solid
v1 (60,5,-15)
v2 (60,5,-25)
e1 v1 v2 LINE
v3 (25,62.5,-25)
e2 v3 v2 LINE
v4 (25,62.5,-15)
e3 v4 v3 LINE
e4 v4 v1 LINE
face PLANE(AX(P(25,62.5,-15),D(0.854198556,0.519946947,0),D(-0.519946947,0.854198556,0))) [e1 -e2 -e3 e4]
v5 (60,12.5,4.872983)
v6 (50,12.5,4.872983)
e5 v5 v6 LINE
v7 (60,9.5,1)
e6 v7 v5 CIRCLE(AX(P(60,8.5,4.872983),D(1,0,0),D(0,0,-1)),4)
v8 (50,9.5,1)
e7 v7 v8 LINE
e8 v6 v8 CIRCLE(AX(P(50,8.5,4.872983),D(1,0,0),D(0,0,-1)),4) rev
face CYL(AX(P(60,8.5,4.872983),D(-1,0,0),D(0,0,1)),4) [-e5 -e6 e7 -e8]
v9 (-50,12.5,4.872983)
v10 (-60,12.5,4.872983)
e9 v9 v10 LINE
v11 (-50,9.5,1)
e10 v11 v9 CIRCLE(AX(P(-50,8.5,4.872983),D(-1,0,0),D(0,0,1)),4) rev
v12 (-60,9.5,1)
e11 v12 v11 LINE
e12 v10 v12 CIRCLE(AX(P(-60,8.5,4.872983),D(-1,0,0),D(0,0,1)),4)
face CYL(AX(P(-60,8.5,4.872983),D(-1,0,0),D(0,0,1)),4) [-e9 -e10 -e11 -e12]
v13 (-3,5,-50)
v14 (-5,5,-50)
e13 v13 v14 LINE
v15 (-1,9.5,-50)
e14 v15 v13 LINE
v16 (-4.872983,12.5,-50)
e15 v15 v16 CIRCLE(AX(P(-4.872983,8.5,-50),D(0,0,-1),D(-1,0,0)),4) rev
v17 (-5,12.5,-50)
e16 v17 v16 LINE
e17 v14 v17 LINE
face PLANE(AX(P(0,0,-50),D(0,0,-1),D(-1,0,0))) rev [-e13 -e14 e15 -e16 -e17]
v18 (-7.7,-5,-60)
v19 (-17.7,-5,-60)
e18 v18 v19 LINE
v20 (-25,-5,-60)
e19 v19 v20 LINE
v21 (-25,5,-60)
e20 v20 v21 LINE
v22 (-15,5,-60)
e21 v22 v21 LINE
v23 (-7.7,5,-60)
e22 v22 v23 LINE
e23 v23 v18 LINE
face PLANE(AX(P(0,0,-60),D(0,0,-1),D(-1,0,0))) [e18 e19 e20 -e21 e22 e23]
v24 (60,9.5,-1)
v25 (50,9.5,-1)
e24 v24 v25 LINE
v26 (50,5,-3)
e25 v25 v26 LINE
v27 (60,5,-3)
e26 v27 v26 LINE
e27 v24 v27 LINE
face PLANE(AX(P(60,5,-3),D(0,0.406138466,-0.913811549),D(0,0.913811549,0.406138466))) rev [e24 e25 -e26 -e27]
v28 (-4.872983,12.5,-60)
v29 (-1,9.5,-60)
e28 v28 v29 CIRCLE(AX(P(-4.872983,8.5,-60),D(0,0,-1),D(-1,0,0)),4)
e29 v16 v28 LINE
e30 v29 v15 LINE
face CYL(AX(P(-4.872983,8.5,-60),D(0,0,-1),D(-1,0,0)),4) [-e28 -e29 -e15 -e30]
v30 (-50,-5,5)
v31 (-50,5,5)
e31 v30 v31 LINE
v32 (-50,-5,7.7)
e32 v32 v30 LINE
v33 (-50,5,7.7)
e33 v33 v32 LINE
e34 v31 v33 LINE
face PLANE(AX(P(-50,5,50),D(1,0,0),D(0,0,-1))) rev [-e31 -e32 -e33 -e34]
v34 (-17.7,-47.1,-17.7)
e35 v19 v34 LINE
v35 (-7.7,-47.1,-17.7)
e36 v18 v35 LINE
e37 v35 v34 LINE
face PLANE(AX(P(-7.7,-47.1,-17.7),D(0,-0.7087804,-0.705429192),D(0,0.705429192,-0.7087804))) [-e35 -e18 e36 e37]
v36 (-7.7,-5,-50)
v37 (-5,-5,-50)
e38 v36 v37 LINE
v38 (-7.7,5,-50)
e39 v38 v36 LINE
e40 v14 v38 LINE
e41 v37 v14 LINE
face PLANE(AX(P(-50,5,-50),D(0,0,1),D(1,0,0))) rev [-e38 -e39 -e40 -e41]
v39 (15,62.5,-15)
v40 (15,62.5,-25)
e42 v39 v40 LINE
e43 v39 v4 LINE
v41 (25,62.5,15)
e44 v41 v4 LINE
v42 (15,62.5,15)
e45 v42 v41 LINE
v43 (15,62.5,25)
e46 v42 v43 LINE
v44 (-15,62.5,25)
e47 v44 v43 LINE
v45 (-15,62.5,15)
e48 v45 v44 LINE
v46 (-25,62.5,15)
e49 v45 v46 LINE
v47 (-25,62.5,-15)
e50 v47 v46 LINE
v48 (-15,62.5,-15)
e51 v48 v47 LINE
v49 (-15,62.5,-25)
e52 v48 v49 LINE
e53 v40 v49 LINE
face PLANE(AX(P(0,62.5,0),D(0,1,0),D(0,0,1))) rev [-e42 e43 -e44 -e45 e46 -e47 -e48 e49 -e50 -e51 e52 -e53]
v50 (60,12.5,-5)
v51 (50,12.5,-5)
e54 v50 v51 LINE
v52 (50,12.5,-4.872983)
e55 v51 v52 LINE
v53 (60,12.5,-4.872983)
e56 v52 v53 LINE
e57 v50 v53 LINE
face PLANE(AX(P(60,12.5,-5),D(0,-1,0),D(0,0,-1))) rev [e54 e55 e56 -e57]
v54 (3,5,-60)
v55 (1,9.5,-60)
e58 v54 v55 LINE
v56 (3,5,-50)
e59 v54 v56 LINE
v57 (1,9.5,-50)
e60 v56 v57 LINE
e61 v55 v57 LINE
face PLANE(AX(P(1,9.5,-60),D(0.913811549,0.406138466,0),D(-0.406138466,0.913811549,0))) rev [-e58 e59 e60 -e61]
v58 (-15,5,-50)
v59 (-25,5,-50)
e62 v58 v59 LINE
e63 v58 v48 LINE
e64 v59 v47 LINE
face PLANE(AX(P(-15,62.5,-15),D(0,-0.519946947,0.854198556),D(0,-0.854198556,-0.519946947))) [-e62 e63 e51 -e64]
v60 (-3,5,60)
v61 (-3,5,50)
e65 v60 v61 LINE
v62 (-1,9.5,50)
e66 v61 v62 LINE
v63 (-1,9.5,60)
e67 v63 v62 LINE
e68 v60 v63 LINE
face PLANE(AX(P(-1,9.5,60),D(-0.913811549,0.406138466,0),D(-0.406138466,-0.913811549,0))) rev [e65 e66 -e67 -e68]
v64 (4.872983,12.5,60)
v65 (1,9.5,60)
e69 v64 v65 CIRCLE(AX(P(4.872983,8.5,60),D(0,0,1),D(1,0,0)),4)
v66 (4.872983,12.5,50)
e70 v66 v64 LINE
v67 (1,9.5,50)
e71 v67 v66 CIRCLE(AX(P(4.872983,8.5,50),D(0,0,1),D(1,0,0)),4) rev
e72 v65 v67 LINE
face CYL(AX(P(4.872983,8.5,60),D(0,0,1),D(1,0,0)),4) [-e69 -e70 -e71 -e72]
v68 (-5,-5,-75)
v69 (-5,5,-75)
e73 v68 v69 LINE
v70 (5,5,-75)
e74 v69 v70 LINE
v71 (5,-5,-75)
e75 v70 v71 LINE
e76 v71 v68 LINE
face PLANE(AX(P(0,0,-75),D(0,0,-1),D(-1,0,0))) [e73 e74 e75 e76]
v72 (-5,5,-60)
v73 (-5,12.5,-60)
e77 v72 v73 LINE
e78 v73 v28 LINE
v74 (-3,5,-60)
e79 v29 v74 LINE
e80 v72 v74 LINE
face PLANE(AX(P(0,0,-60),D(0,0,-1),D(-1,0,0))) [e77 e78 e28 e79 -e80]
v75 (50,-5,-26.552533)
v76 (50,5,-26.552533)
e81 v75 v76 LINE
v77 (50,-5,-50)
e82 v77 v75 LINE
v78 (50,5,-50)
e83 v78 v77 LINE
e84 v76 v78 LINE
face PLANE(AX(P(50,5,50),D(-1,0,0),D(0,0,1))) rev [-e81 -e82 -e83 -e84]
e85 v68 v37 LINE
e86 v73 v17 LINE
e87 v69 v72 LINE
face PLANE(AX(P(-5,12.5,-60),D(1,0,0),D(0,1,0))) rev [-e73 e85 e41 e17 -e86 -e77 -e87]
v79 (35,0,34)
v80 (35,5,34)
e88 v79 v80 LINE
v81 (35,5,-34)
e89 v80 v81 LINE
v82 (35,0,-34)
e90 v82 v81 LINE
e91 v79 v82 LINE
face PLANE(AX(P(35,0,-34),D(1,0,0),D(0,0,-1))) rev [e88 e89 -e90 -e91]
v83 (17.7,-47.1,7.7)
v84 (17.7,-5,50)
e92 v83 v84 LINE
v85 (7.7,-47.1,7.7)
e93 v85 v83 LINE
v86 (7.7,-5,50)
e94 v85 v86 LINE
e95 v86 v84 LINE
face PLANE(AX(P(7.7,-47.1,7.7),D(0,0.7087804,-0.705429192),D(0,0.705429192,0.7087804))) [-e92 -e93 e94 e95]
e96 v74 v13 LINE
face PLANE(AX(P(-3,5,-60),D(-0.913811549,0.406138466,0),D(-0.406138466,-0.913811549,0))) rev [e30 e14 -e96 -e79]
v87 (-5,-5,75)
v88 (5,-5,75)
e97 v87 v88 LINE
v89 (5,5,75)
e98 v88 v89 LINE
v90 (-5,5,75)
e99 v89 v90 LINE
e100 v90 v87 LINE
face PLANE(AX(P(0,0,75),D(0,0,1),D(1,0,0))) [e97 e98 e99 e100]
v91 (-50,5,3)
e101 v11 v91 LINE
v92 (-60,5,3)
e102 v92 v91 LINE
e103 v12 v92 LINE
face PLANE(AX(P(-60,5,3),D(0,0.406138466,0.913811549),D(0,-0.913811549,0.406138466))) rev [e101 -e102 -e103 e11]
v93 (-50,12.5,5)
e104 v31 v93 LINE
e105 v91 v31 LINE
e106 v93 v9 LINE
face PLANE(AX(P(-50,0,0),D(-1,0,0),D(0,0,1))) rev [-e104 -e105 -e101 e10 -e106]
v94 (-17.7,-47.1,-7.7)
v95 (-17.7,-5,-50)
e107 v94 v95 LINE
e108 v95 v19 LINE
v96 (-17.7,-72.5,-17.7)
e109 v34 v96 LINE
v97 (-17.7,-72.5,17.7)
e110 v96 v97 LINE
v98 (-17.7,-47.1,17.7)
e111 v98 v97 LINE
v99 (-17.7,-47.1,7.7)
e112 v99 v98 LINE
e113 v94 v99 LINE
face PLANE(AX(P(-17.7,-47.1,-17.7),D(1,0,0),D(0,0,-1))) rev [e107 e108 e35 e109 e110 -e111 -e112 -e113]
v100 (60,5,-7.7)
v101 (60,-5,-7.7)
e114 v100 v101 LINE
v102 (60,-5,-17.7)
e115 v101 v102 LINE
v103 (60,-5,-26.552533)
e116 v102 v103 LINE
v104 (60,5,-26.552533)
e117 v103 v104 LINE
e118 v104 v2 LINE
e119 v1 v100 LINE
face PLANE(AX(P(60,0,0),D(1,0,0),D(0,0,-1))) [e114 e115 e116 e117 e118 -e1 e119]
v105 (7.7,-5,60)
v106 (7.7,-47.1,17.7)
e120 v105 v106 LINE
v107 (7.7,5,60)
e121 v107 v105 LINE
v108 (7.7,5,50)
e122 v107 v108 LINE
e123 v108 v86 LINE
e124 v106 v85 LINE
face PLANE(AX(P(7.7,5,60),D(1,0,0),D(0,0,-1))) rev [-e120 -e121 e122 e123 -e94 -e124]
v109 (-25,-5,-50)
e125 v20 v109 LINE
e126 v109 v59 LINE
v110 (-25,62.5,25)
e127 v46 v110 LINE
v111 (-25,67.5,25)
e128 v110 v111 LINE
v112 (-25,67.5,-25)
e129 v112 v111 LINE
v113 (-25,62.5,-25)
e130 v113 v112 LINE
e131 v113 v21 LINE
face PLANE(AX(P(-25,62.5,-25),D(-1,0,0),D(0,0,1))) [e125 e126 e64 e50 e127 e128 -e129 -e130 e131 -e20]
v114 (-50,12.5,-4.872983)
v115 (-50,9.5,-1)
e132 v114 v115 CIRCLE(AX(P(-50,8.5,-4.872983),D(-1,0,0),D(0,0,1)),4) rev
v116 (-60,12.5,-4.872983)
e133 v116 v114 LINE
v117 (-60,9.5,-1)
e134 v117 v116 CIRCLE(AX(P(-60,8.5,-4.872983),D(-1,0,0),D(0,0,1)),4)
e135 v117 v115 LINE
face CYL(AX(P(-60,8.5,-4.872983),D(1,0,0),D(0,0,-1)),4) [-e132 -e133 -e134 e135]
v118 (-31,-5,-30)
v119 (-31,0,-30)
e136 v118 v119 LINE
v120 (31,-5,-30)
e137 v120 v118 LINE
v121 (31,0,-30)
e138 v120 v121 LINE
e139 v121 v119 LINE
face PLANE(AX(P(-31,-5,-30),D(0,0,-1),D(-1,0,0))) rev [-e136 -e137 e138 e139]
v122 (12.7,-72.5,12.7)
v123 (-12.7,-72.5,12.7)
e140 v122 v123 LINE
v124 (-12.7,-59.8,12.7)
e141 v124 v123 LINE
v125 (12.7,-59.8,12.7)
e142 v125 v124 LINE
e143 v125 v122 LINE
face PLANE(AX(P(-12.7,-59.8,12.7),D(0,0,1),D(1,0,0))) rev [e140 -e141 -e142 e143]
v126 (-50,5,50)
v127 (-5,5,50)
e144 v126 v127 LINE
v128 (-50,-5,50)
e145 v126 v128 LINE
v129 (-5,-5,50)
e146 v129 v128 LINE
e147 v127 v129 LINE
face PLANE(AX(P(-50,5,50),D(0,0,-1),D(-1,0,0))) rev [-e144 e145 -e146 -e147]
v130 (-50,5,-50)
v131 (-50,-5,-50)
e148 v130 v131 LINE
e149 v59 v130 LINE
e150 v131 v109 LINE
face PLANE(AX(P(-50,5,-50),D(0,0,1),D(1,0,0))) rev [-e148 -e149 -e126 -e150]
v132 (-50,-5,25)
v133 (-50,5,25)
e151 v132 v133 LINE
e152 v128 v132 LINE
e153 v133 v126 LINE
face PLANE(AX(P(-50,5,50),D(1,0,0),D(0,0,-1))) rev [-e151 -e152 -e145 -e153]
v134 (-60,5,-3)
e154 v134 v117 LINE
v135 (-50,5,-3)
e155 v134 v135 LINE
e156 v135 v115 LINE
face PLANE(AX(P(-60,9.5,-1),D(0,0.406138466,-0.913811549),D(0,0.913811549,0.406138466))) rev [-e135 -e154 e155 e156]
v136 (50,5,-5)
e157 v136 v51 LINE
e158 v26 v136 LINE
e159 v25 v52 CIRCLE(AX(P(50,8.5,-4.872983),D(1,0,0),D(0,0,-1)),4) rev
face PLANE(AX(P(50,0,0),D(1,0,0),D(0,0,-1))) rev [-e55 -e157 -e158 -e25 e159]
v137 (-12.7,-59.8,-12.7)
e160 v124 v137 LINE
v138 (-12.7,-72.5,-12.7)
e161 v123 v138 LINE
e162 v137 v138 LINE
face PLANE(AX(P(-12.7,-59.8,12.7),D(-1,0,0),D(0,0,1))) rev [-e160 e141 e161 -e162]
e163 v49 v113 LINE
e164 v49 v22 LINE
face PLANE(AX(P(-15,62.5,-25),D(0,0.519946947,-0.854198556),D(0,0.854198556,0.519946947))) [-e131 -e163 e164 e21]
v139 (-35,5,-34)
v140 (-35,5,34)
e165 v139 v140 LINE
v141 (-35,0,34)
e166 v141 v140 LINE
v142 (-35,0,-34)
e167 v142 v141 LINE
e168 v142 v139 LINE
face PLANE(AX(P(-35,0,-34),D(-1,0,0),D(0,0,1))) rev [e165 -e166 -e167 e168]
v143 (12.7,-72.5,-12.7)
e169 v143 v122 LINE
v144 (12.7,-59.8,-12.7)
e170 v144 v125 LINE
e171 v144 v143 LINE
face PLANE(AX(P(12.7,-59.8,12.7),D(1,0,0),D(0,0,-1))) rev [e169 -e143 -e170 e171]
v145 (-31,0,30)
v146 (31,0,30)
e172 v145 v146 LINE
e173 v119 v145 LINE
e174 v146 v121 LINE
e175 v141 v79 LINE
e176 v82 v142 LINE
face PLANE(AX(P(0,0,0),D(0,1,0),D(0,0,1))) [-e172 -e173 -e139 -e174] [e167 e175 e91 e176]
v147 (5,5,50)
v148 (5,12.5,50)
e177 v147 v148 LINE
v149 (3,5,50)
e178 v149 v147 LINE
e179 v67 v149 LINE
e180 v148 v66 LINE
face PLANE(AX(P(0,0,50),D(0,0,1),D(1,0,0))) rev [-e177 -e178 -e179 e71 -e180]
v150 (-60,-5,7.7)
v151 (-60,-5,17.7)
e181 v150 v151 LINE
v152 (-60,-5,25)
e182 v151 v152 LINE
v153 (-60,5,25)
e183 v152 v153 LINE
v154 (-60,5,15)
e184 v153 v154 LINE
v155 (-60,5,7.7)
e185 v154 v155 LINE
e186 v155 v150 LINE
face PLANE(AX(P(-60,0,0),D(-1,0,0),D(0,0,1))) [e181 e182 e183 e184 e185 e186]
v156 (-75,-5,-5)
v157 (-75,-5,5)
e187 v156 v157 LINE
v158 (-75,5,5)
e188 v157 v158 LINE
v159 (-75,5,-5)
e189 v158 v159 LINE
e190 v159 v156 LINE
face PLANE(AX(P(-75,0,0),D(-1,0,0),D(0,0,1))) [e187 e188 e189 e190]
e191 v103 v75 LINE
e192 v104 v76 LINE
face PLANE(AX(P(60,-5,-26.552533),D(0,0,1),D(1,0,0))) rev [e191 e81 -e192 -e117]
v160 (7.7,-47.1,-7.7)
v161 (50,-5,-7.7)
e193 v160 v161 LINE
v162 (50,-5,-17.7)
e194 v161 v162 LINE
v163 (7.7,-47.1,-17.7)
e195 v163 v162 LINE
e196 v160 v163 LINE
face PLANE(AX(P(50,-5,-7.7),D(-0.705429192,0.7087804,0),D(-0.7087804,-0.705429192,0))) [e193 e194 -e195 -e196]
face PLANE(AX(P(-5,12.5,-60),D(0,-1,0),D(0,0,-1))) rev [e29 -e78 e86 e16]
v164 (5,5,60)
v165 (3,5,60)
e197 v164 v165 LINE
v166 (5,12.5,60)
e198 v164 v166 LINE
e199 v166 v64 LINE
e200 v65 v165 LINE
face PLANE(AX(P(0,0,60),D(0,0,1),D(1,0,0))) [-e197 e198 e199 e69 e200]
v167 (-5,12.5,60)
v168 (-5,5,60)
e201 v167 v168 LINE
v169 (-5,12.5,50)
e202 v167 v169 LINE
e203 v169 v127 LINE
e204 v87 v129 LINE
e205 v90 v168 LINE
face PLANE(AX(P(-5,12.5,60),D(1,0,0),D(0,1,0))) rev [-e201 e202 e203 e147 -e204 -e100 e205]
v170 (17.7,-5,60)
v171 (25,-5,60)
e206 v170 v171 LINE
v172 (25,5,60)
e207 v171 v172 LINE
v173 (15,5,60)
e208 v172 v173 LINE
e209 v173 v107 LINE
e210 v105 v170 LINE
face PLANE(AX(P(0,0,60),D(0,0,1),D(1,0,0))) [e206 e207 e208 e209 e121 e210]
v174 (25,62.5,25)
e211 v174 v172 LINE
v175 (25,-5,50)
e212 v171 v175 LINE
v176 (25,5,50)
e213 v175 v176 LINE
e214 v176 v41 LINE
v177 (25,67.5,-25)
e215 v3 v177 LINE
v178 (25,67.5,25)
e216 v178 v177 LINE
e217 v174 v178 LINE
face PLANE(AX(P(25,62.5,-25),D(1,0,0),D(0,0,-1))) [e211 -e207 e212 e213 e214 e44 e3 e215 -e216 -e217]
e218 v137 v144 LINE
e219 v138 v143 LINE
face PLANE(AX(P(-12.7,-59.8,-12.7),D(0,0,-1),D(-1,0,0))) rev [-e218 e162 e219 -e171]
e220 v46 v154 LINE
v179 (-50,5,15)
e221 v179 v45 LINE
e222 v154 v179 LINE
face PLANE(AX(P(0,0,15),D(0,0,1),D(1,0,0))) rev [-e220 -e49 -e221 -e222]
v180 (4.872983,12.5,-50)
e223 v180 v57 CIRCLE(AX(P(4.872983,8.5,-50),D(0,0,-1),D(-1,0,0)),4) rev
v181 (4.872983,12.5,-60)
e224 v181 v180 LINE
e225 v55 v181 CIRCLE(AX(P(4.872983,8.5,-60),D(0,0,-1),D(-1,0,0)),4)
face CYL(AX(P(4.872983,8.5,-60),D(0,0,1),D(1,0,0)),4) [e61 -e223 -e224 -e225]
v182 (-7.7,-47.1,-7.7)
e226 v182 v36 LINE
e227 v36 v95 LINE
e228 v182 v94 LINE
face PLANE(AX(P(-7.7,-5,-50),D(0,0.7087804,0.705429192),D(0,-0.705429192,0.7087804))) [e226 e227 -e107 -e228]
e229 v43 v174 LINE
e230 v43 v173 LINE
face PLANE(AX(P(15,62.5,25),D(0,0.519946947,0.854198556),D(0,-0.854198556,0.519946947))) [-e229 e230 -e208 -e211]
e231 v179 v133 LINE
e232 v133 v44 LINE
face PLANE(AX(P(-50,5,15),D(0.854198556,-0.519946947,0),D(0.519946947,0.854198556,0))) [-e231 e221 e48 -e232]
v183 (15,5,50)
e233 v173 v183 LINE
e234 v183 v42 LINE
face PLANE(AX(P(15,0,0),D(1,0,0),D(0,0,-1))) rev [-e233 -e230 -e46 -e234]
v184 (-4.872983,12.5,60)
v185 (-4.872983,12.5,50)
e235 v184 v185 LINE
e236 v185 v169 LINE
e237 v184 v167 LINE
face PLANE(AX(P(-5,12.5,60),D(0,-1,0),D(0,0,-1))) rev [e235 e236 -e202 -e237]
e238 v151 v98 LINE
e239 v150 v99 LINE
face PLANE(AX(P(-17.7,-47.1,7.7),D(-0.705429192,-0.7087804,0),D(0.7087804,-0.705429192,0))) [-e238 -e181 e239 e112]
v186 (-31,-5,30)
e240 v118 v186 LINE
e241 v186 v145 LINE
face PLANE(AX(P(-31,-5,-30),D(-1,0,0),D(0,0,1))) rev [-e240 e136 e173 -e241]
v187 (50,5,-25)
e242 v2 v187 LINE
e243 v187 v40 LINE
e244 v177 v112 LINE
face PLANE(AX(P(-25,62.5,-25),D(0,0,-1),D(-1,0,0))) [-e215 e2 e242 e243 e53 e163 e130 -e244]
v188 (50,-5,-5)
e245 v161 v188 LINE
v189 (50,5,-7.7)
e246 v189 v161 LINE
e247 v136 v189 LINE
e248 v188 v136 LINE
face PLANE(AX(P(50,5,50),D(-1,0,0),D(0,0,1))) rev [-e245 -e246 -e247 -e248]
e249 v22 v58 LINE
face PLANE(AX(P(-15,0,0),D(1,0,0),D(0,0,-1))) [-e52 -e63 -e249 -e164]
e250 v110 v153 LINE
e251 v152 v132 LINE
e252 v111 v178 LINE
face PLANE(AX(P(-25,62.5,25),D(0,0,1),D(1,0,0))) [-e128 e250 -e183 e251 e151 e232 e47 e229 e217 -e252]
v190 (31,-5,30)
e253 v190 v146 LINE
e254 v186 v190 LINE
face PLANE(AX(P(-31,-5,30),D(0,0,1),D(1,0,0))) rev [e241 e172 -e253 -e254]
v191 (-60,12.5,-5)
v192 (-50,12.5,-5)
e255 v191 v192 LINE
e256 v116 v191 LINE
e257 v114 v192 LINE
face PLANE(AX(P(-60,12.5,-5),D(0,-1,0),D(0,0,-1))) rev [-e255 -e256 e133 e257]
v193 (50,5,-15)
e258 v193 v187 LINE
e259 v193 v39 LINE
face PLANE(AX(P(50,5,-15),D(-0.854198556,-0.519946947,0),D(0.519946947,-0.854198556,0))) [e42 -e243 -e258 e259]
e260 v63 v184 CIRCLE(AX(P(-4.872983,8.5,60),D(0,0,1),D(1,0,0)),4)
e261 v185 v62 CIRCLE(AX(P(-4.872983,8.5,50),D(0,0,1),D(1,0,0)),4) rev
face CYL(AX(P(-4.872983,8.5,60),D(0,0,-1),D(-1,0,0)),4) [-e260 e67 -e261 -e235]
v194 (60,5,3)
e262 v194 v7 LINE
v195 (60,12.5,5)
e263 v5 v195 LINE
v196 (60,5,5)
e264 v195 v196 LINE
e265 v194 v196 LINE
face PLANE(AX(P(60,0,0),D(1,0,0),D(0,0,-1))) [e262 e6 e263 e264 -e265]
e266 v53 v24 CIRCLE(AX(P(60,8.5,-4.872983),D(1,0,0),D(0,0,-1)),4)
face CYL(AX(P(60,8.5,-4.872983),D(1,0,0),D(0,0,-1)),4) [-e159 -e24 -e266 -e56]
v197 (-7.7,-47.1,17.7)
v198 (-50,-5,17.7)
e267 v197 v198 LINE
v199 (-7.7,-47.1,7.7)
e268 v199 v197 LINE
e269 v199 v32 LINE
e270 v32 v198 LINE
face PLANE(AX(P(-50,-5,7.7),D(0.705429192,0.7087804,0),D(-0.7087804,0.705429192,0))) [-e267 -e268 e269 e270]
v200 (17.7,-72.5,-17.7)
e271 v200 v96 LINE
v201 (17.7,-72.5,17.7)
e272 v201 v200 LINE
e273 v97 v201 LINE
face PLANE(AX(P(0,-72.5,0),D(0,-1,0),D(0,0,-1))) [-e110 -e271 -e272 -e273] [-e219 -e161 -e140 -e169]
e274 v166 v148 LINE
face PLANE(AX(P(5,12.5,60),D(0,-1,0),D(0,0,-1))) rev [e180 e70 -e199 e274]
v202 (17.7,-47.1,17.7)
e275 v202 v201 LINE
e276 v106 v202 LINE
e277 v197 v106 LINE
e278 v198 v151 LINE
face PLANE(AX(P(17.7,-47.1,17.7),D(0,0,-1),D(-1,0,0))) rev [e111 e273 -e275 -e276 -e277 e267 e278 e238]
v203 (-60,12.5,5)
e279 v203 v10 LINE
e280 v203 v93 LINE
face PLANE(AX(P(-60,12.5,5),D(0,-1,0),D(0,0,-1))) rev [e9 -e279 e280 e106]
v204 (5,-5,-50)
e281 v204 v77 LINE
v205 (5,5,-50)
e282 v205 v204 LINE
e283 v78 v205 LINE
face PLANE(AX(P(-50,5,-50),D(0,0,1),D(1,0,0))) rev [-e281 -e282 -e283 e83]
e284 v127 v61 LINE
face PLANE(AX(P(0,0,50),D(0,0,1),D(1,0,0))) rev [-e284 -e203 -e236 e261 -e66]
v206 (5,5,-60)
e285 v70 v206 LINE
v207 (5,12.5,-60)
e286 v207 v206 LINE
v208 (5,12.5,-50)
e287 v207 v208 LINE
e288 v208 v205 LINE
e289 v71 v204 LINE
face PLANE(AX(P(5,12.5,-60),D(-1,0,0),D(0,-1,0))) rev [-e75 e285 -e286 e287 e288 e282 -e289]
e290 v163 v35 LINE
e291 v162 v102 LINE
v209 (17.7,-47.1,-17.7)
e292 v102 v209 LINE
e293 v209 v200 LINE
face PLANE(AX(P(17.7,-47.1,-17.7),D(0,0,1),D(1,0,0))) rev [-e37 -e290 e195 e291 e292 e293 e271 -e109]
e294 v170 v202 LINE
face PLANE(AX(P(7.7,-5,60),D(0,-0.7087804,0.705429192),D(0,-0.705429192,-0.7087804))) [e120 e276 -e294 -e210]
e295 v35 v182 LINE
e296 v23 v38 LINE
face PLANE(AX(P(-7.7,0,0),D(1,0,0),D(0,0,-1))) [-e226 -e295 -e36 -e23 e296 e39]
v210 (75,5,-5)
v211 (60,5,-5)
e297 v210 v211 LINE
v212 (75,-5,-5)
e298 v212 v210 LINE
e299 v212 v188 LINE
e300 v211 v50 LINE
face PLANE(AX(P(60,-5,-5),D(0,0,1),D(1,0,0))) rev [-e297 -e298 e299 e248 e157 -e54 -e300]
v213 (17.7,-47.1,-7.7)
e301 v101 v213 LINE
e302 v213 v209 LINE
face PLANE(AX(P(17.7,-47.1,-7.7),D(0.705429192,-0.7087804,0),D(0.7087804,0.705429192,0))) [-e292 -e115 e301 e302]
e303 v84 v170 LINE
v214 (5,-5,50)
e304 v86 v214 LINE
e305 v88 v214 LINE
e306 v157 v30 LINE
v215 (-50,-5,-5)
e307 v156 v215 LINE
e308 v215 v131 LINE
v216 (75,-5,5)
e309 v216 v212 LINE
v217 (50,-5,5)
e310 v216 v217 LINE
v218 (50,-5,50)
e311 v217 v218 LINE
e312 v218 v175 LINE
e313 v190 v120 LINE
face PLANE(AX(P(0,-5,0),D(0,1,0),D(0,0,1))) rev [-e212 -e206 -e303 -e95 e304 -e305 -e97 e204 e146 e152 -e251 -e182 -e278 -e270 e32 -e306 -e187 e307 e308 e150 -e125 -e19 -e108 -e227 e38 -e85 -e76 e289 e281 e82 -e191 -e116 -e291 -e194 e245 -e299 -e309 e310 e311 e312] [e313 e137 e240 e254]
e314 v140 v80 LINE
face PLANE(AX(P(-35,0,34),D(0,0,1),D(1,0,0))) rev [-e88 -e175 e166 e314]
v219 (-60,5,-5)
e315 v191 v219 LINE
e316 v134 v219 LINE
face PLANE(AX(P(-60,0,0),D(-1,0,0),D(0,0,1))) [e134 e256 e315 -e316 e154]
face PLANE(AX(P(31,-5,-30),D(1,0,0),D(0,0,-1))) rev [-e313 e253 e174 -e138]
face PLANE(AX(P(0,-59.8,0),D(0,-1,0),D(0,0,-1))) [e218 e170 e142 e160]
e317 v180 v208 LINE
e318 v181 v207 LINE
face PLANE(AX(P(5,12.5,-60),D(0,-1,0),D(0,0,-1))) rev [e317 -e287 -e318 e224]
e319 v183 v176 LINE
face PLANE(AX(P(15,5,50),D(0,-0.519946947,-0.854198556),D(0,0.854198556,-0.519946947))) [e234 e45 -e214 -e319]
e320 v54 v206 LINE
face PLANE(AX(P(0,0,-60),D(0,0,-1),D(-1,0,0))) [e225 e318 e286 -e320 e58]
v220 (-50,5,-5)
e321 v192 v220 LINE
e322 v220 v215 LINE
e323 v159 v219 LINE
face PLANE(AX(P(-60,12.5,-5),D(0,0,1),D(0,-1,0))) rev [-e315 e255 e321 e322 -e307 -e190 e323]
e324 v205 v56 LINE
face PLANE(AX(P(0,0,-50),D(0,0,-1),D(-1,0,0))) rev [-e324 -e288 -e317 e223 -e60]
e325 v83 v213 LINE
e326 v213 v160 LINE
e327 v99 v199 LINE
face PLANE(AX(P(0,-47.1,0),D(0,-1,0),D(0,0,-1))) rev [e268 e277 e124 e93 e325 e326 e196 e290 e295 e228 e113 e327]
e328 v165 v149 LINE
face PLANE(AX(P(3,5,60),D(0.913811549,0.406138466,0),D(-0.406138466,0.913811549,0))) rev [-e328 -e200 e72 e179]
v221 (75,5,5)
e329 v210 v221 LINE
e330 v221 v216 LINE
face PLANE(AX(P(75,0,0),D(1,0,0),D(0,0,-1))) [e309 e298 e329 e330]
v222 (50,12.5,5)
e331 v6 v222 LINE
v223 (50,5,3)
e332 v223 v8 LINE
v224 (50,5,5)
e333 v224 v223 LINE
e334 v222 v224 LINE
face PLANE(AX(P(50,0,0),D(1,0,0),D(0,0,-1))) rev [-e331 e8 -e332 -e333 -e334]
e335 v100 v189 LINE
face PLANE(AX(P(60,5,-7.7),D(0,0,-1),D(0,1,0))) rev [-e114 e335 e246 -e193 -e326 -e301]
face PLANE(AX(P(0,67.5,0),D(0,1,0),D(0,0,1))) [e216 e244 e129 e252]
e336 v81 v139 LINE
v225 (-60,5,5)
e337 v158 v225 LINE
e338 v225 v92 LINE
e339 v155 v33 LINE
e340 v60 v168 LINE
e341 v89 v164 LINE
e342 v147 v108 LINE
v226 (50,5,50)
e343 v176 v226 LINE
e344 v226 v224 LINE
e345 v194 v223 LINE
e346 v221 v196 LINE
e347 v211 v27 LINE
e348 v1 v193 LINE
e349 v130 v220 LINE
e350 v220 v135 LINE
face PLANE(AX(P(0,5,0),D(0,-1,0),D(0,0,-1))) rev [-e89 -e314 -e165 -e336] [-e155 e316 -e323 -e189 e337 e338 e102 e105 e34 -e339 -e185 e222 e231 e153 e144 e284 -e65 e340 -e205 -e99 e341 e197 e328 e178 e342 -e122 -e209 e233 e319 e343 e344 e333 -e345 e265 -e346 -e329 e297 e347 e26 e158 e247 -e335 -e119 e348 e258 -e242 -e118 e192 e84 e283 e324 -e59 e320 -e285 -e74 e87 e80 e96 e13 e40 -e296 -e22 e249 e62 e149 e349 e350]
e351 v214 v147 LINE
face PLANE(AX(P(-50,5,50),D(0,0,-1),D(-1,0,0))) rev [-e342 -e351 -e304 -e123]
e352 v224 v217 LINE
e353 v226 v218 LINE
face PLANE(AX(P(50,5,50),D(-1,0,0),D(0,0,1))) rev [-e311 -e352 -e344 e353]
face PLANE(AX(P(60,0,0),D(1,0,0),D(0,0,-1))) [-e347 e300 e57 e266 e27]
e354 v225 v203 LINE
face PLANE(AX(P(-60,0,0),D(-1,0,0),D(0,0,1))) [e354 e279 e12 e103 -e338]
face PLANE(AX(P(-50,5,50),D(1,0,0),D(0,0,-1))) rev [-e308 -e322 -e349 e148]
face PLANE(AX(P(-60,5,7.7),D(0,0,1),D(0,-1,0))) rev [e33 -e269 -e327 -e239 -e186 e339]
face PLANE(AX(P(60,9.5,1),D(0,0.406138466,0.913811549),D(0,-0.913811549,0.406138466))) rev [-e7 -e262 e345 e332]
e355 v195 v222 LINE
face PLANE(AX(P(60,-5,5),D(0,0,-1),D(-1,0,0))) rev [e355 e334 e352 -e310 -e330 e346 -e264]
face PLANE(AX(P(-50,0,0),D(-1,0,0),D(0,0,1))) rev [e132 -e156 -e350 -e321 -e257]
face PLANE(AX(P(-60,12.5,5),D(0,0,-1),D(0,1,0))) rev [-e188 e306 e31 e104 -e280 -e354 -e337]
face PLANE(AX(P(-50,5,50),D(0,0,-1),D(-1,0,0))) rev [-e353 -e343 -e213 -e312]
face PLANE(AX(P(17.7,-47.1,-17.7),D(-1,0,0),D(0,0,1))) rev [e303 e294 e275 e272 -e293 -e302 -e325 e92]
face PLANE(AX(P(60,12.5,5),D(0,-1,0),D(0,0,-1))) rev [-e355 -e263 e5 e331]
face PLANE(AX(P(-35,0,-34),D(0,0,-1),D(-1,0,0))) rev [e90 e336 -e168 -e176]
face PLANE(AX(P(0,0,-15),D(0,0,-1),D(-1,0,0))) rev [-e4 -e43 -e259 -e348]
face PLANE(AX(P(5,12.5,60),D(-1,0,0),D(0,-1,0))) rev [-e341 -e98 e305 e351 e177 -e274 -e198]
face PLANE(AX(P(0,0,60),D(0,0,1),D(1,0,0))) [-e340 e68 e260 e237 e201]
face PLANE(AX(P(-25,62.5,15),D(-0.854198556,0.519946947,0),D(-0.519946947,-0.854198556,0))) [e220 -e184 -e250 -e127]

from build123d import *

# Parameters (mm, degrees)
SKETCH2_W            = 100
SKETCH2_H            = 100
BOSS_EXTRUDE1_DEPTH  = 5
SKETCH3_W            = 100
SKETCH3_H            = 100
BOSS_EXTRUDE2_DEPTH  = 5
SKETCH8_R            = 5
BOSS_EXTRUDE7_DEPTH  = 30
BOSS_EXTRUDE21_DEPTH = 10
FILLET14_R           = 4
FILLET13_R           = 4
SKETCH24_W           = 10
SKETCH24_H           = 10
BOSS_EXTRUDE22_DEPTH = 15
BOSS_EXTRUDE25_DEPTH = 10
SKETCH26_W           = 10
SKETCH26_H           = 10
BOSS_EXTRUDE26_DEPTH = 15
FILLET18_R           = 4
FILLET17_R           = 4
BOSS_EXTRUDE23_DEPTH = 10
SKETCH25_W           = 10
SKETCH25_H           = 10
BOSS_EXTRUDE24_DEPTH = 15
FILLET15_R           = 4
FILLET16_R           = 4
BOSS_EXTRUDE10_DEPTH = 10
FILLET19_R           = 4
SKETCH27_W           = 10
SKETCH27_H           = 10
BOSS_EXTRUDE27_DEPTH = 15
FILLET20_R           = 4
SKETCH62_R           = 11.223510807
CUT_EXTRUDE3_DEPTH   = 30
SKETCH64_W           = 35.4
SKETCH64_H           = 35.4
BOSS_EXTRUDE53_DEPTH = 25.4
SKETCH66_W           = 25.4
SKETCH66_H           = 25.4
CUT_EXTRUDE4_DEPTH   = 12.7
SKETCH67_W           = 50
SKETCH67_H           = 50
BOSS_EXTRUDE54_DEPTH = 5
SKETCH68_W           = 17.3
SKETCH68_H           = 10
BOSS_EXTRUDE55_DEPTH = 10
SKETCH69_W           = 17.3
SKETCH69_H           = 10
BOSS_EXTRUDE56_DEPTH = 10
SKETCH70_W           = 17.3
SKETCH70_H           = 10
BOSS_EXTRUDE57_DEPTH = 10
SKETCH74_W           = 17.3
SKETCH74_H           = 10
BOSS_EXTRUDE58_DEPTH = 10
BOSS_EXTRUDE59_DEPTH = 10
BOSS_EXTRUDE60_DEPTH = 10
BOSS_EXTRUDE61_DEPTH = 10
BOSS_EXTRUDE62_DEPTH = 10
BOSS_EXTRUDE63_DEPTH = 10
BOSS_EXTRUDE64_DEPTH = 10
SKETCH85_W           = 17.3
SKETCH85_H           = 10
BOSS_EXTRUDE65_DEPTH = 10
BOSS_EXTRUDE66_DEPTH = 10
BOSS_EXTRUDE67_DEPTH = 10
SKETCH90_W           = 70
SKETCH90_H           = 68
CUT_EXTRUDE5_DEPTH   = 5
SKETCH91_W           = 62
SKETCH91_H           = 60
CUT_EXTRUDE6_DEPTH   = 5


with BuildPart() as part:
    # Sketch2 → Boss-Extrude1 (new body)
    with BuildSketch(Plane(origin=(0, 0, 0), x_dir=(1, 0, 0), z_dir=(0, 1, 0))):
        Rectangle(SKETCH2_W, SKETCH2_H)
    extrude(amount=BOSS_EXTRUDE1_DEPTH)

    # Sketch3 → Boss-Extrude2 (add)
    with BuildSketch(Plane.XZ):
        Rectangle(SKETCH3_W, SKETCH3_H)
    extrude(amount=BOSS_EXTRUDE2_DEPTH)

    # Sketch8 → Boss-Extrude7 (add)
    with BuildSketch(Plane.XZ.offset(5)):
        with Locations(Location((0, 0, 0), (0, 0, 90))):
            Circle(SKETCH8_R)
    extrude(amount=BOSS_EXTRUDE7_DEPTH)

    # Sketch11 → Boss-Extrude21 (add)
    with BuildSketch(Plane(origin=(50, 0, 0), x_dir=(0, 0, -1), z_dir=(1, 0, 0))):
        Polygon((5, -5), (5, 12.5), (1, 12.5), (1, 9.5), (3, 5), (-3, 5), (-1, 9.5), (-1, 12.5), (-5, 12.5), (-5, -5), align=None)
    extrude(amount=BOSS_EXTRUDE21_DEPTH)

    # Fillet14
    # the kernel refuses this fillet: 4 mm, written as the material it takes off along each edge
    with BuildSketch(Plane(origin=(40.317541634, 12.5, -1), x_dir=(0, -1, 0), z_dir=(1, 0, 0))) as fillet14_piece_1:
        with BuildLine():
            CenterArc((4, 3.872983346), FILLET14_R, 180, 75.522487814)
            Line((0, 3.872983346), (-0.08, 3.872983346))
            Line((-0.08, 3.872983346), (-0.08, 0))
            Line((-0.08, 0), (0, -0.08))
            ThreePointArc((0, -0.08), (1.5, -0.08), (2.98, -0.077459667))
            Line((2.98, -0.077459667), (3, 0))
        make_face()
    extrude(amount=29.364916731, mode=Mode.SUBTRACT)

    # Fillet13
    # the kernel refuses this fillet: 4 mm, written as the material it takes off along each edge
    with BuildSketch(Plane(origin=(40.317541634, 12.5, 1), x_dir=(0, 0, 1), z_dir=(1, 0, 0))) as fillet13_piece_1:
        with BuildLine():
            CenterArc((3.872983346, 4), FILLET13_R, 194.477512186, 75.522487814)
            Line((0, 3), (-0.077459667, 2.98))
            ThreePointArc((-0.077459667, 2.98), (-0.08, 1.5), (-0.08, 0))
            Line((-0.08, 0), (0, -0.08))
            Line((0, -0.08), (3.872983346, -0.08))
            Line((3.872983346, -0.08), (3.872983346, 0))
        make_face()
    extrude(amount=29.364916731, mode=Mode.SUBTRACT)

    # Sketch24 → Boss-Extrude22 (add)
    with BuildSketch(Plane(origin=(60, 0, 0), x_dir=(0, 0, -1), z_dir=(1, 0, 0))):
        Rectangle(SKETCH24_W, SKETCH24_H)
    extrude(amount=BOSS_EXTRUDE22_DEPTH)

    # Sketch13 → Boss-Extrude25 (add)
    with BuildSketch(Plane.ZY.offset(50)):
        Polygon((-5, 12.5), (-5, -5), (5, -5), (5, 12.5), (1, 12.5), (1, 9.5), (3, 5), (-3, 5), (-1, 9.5), (-1, 12.5), align=None)
    extrude(amount=BOSS_EXTRUDE25_DEPTH)

    # Sketch26 → Boss-Extrude26 (add)
    with BuildSketch(Plane.ZY.offset(60)):
        Rectangle(SKETCH26_W, SKETCH26_H)
    extrude(amount=BOSS_EXTRUDE26_DEPTH)

    # Fillet18
    # the kernel refuses this fillet: 4 mm, written as the material it takes off along each edge
    with BuildSketch(Plane(origin=(-40.317541634, 12.5, 1), x_dir=(0, -1, 0), z_dir=(-1, 0, 0))) as fillet18_piece_1:
        with BuildLine():
            CenterArc((4, 3.872983346), FILLET18_R, 180, 75.522487814)
            Line((0, 3.872983346), (-0.08, 3.872983346))
            Line((-0.08, 3.872983346), (-0.08, 0))
            Line((-0.08, 0), (0, -0.08))
            ThreePointArc((0, -0.08), (1.5, -0.08), (2.98, -0.077459667))
            Line((2.98, -0.077459667), (3, 0))
        make_face()
    extrude(amount=29.364916731, mode=Mode.SUBTRACT)

    # Fillet17
    # the kernel refuses this fillet: 4 mm, written as the material it takes off along each edge
    with BuildSketch(Plane(origin=(-40.317541634, 12.5, -1), x_dir=(0, 0, -1), z_dir=(-1, 0, 0))) as fillet17_piece_1:
        with BuildLine():
            CenterArc((3.872983346, 4), FILLET17_R, 194.477512186, 75.522487814)
            Line((0, 3), (-0.077459667, 2.98))
            ThreePointArc((-0.077459667, 2.98), (-0.08, 1.5), (-0.08, 0))
            Line((-0.08, 0), (0, -0.08))
            Line((0, -0.08), (3.872983346, -0.08))
            Line((3.872983346, -0.08), (3.872983346, 0))
        make_face()
    extrude(amount=29.364916731, mode=Mode.SUBTRACT)

    # Sketch14 → Boss-Extrude23 (add)
    with BuildSketch(Plane(origin=(0, 0, -50), x_dir=(-1, 0, 0), z_dir=(0, 0, -1))):
        Polygon((-5, 12.5), (-1, 12.5), (-1, 9.5), (-3, 5), (3, 5), (1, 9.5), (1, 12.5), (5, 12.5), (5, -5), (-5, -5), align=None)
    extrude(amount=BOSS_EXTRUDE23_DEPTH)

    # Sketch25 → Boss-Extrude24 (add)
    with BuildSketch(Plane(origin=(0, 0, -60), x_dir=(-1, 0, 0), z_dir=(0, 0, -1))):
        Rectangle(SKETCH25_W, SKETCH25_H)
    extrude(amount=BOSS_EXTRUDE24_DEPTH)

    # Fillet15
    # the kernel refuses this fillet: 4 mm, written as the material it takes off along each edge
    with BuildSketch(Plane(origin=(-1, 12.5, -40.317541634), x_dir=(0, -1, 0), z_dir=(0, 0, -1))) as fillet15_piece_1:
        with BuildLine():
            CenterArc((4, 3.872983346), FILLET15_R, 180, 75.522487814)
            Line((0, 3.872983346), (-0.08, 3.872983346))
            Line((-0.08, 3.872983346), (-0.08, 0))
            Line((-0.08, 0), (0, -0.08))
            ThreePointArc((0, -0.08), (1.5, -0.08), (2.98, -0.077459667))
            Line((2.98, -0.077459667), (3, 0))
        make_face()
    extrude(amount=29.364916731, mode=Mode.SUBTRACT)

    # Fillet16
    # the kernel refuses this fillet: 4 mm, written as the material it takes off along each edge
    with BuildSketch(Plane(origin=(1, 12.5, -40.317541634), x_dir=(0, -1, 0), z_dir=(0, 0, -1))) as fillet16_piece_1:
        with BuildLine():
            CenterArc((4, -3.872983346), FILLET16_R, 104.477512186, 75.522487814)
            Line((0, -3.872983346), (-0.08, -3.872983346))
            Line((-0.08, -3.872983346), (-0.08, 0))
            Line((-0.08, 0), (0, 0.08))
            ThreePointArc((0, 0.08), (1.5, 0.08), (2.98, 0.077459667))
            Line((2.98, 0.077459667), (3, 0))
        make_face()
    extrude(amount=29.364916731, mode=Mode.SUBTRACT)

    # Sketch12 → Boss-Extrude10 (add)
    with BuildSketch(Plane.XY.offset(50)):
        Polygon((-5, 12.5), (-5, -5), (5, -5), (5, 12.5), (1, 12.5), (1, 9.5), (3, 5), (-3, 5), (-1, 9.5), (-1, 12.5), align=None)
    extrude(amount=BOSS_EXTRUDE10_DEPTH)

    # Fillet19
    # the kernel refuses this fillet: 4 mm, written as the material it takes off along each edge
    with BuildSketch(Plane(origin=(-1, 12.5, 40.317541634), x_dir=(-1, 0, 0), z_dir=(0, 0, 1))) as fillet19_piece_1:
        with BuildLine():
            CenterArc((3.872983346, 4), FILLET19_R, 194.477512186, 75.522487814)
            Line((0, 3), (-0.077459667, 2.98))
            ThreePointArc((-0.077459667, 2.98), (-0.08, 1.5), (-0.08, 0))
            Line((-0.08, 0), (0, -0.08))
            Line((0, -0.08), (3.872983346, -0.08))
            Line((3.872983346, -0.08), (3.872983346, 0))
        make_face()
    extrude(amount=29.364916731, mode=Mode.SUBTRACT)

    # Sketch27 → Boss-Extrude27 (add)
    with BuildSketch(Plane.XY.offset(60)):
        Rectangle(SKETCH27_W, SKETCH27_H)
    extrude(amount=BOSS_EXTRUDE27_DEPTH)

    # Fillet20
    # the kernel refuses this fillet: 4 mm, written as the material it takes off along each edge
    with BuildSketch(Plane(origin=(1, 12.5, 40.317541634), x_dir=(1, 0, 0), z_dir=(0, 0, 1))) as fillet20_piece_1:
        with BuildLine():
            CenterArc((3.872983346, -4), FILLET20_R, 90, 75.522487814)
            Line((0, -3), (-0.077459667, -2.98))
            ThreePointArc((-0.077459667, -2.98), (-0.08, -1.5), (-0.08, 0))
            Line((-0.08, 0), (0, 0.08))
            Line((0, 0.08), (3.872983346, 0.08))
            Line((3.872983346, 0.08), (3.872983346, 0))
        make_face()
    extrude(amount=29.364916731, mode=Mode.SUBTRACT)

    # Sketch62 → Cut-Extrude3 (cut)
    with BuildSketch(Plane.XZ.offset(5)):
        Circle(SKETCH62_R)
    extrude(amount=CUT_EXTRUDE3_DEPTH, mode=Mode.SUBTRACT)

    # Sketch68 → Boss-Extrude55 (add)
    with BuildSketch(Plane.XY.offset(50)):
        with Locations((16.35, 0)):
            Rectangle(SKETCH68_W, SKETCH68_H)
    extrude(amount=BOSS_EXTRUDE55_DEPTH)

    # Sketch69 → Boss-Extrude56 (add)
    with BuildSketch(Plane(origin=(50, 0, 0), x_dir=(0, 0, -1), z_dir=(1, 0, 0))):
        with Locations((17.90253263, 0)):
            Rectangle(SKETCH69_W, SKETCH69_H)
    extrude(amount=BOSS_EXTRUDE56_DEPTH)

    # Sketch70 → Boss-Extrude57 (add)
    with BuildSketch(Plane(origin=(0, 0, -50), x_dir=(-1, 0, 0), z_dir=(0, 0, -1))):
        with Locations((16.35, 0)):
            Rectangle(SKETCH70_W, SKETCH70_H)
    extrude(amount=BOSS_EXTRUDE57_DEPTH)

    # Sketch74 → Boss-Extrude58 (add)
    with BuildSketch(Plane.ZY.offset(50)):
        with Locations((16.35, 0)):
            Rectangle(SKETCH74_W, SKETCH74_H)
    extrude(amount=BOSS_EXTRUDE58_DEPTH)



with BuildPart() as body_2:
    # Sketch64 → Boss-Extrude53 (new body)
    with BuildSketch(Plane(origin=(0, -72.5, 0), x_dir=(1, 0, 0), z_dir=(0, 1, 0))):
        Rectangle(SKETCH64_W, SKETCH64_H)
    extrude(amount=BOSS_EXTRUDE53_DEPTH)

    # Sketch66 → Cut-Extrude4 (cut)
    with BuildSketch(Plane(origin=(0, -72.5, 0), x_dir=(-1, 0, 0), z_dir=(0, -1, 0))):
        Rectangle(SKETCH66_W, SKETCH66_H)
    extrude(amount=-CUT_EXTRUDE4_DEPTH, mode=Mode.SUBTRACT)


with BuildPart() as body_3:
    # Sketch67 → Boss-Extrude54 (new body)
    with BuildSketch(Plane(origin=(0, 67.5, 0), x_dir=(1, 0, 0), z_dir=(0, 1, 0))):
        Rectangle(SKETCH67_W, SKETCH67_H)
    extrude(amount=-BOSS_EXTRUDE54_DEPTH)


with BuildPart() as part_1:
    add(part.part)

    add(body_2.part)  # Boss-Extrude59 merges body 2
    # Sketch76 → Boss-Extrude59 (add)
    with BuildSketch(Plane.ZY.offset(17.7)):
        Polygon((-17.7, -47.1), (-60, -5), (-50, -5), (-7.7, -47.1), align=None)
    extrude(amount=-BOSS_EXTRUDE59_DEPTH)


    add(body_3.part)  # Boss-Extrude60 merges body 3
    # Sketch77 → Boss-Extrude60 (add)
    with BuildSketch(Plane.ZY.offset(25)):
        Polygon((-25, 62.5), (-60, 5), (-50, 5), (-15, 62.5), align=None)
    extrude(amount=-BOSS_EXTRUDE60_DEPTH)

    # Sketch78 → Boss-Extrude61 (add)
    with BuildSketch(Plane.XY.offset(17.7)):
        Polygon((-17.7, -47.1), (-60, -5), (-50, -5), (-7.7, -47.1), align=None)
    extrude(amount=-BOSS_EXTRUDE61_DEPTH)

    # Sketch79 → Boss-Extrude62 (add)
    with BuildSketch(Plane.XY.offset(25)):
        Polygon((-25, 62.5), (-60, 5), (-50, 5), (-15, 62.5), align=None)
    extrude(amount=-BOSS_EXTRUDE62_DEPTH)

    # Sketch82 → Boss-Extrude63 (add)
    with BuildSketch(Plane(origin=(17.7, 0, 0), x_dir=(0, 0, -1), z_dir=(1, 0, 0))):
        Polygon((-60, -5), (-17.7, -47.1), (-7.7, -47.1), (-50, -5), align=None)
    extrude(amount=-BOSS_EXTRUDE63_DEPTH)

    # Sketch83 → Boss-Extrude64 (add)
    with BuildSketch(Plane(origin=(25, 0, 0), x_dir=(0, 0, -1), z_dir=(1, 0, 0))):
        Polygon((-25, 62.5), (-60, 5), (-50, 5), (-15, 62.5), align=None)
    extrude(amount=-BOSS_EXTRUDE64_DEPTH)

    # Sketch85 → Boss-Extrude65 (add)
    with BuildSketch(Plane(origin=(50, 0, 0), x_dir=(0, 0, -1), z_dir=(1, 0, 0))):
        with Locations((16.35, 0)):
            Rectangle(SKETCH85_W, SKETCH85_H)
    extrude(amount=BOSS_EXTRUDE65_DEPTH)

    # Sketch86 → Boss-Extrude66 (add)
    with BuildSketch(Plane(origin=(0, 0, -25), x_dir=(-1, 0, 0), z_dir=(0, 0, -1))):
        Polygon((-25, 62.5), (-60, 5), (-50, 5), (-15, 62.5), align=None)
    extrude(amount=-BOSS_EXTRUDE66_DEPTH)

    # Sketch89 → Boss-Extrude67 (add)
    with BuildSketch(Plane(origin=(0, 0, -17.7), x_dir=(-1, 0, 0), z_dir=(0, 0, -1))):
        Polygon((-60, -5), (-50, -5), (-7.7, -47.1), (-17.7, -47.1), align=None)
    extrude(amount=-BOSS_EXTRUDE67_DEPTH)

    # Sketch90 → Cut-Extrude5 (cut)
    with BuildSketch(Plane(origin=(0, 5, 0), x_dir=(1, 0, 0), z_dir=(0, 1, 0))):
        Rectangle(SKETCH90_W, SKETCH90_H)
    extrude(amount=-CUT_EXTRUDE5_DEPTH, mode=Mode.SUBTRACT)

    # Sketch91 → Cut-Extrude6 (cut)
    with BuildSketch(Plane(origin=(0, 0, 0), x_dir=(1, 0, 0), z_dir=(0, 1, 0))):
        Rectangle(SKETCH91_W, SKETCH91_H)
    extrude(amount=-CUT_EXTRUDE6_DEPTH, mode=Mode.SUBTRACT)


solid = part_1.part
